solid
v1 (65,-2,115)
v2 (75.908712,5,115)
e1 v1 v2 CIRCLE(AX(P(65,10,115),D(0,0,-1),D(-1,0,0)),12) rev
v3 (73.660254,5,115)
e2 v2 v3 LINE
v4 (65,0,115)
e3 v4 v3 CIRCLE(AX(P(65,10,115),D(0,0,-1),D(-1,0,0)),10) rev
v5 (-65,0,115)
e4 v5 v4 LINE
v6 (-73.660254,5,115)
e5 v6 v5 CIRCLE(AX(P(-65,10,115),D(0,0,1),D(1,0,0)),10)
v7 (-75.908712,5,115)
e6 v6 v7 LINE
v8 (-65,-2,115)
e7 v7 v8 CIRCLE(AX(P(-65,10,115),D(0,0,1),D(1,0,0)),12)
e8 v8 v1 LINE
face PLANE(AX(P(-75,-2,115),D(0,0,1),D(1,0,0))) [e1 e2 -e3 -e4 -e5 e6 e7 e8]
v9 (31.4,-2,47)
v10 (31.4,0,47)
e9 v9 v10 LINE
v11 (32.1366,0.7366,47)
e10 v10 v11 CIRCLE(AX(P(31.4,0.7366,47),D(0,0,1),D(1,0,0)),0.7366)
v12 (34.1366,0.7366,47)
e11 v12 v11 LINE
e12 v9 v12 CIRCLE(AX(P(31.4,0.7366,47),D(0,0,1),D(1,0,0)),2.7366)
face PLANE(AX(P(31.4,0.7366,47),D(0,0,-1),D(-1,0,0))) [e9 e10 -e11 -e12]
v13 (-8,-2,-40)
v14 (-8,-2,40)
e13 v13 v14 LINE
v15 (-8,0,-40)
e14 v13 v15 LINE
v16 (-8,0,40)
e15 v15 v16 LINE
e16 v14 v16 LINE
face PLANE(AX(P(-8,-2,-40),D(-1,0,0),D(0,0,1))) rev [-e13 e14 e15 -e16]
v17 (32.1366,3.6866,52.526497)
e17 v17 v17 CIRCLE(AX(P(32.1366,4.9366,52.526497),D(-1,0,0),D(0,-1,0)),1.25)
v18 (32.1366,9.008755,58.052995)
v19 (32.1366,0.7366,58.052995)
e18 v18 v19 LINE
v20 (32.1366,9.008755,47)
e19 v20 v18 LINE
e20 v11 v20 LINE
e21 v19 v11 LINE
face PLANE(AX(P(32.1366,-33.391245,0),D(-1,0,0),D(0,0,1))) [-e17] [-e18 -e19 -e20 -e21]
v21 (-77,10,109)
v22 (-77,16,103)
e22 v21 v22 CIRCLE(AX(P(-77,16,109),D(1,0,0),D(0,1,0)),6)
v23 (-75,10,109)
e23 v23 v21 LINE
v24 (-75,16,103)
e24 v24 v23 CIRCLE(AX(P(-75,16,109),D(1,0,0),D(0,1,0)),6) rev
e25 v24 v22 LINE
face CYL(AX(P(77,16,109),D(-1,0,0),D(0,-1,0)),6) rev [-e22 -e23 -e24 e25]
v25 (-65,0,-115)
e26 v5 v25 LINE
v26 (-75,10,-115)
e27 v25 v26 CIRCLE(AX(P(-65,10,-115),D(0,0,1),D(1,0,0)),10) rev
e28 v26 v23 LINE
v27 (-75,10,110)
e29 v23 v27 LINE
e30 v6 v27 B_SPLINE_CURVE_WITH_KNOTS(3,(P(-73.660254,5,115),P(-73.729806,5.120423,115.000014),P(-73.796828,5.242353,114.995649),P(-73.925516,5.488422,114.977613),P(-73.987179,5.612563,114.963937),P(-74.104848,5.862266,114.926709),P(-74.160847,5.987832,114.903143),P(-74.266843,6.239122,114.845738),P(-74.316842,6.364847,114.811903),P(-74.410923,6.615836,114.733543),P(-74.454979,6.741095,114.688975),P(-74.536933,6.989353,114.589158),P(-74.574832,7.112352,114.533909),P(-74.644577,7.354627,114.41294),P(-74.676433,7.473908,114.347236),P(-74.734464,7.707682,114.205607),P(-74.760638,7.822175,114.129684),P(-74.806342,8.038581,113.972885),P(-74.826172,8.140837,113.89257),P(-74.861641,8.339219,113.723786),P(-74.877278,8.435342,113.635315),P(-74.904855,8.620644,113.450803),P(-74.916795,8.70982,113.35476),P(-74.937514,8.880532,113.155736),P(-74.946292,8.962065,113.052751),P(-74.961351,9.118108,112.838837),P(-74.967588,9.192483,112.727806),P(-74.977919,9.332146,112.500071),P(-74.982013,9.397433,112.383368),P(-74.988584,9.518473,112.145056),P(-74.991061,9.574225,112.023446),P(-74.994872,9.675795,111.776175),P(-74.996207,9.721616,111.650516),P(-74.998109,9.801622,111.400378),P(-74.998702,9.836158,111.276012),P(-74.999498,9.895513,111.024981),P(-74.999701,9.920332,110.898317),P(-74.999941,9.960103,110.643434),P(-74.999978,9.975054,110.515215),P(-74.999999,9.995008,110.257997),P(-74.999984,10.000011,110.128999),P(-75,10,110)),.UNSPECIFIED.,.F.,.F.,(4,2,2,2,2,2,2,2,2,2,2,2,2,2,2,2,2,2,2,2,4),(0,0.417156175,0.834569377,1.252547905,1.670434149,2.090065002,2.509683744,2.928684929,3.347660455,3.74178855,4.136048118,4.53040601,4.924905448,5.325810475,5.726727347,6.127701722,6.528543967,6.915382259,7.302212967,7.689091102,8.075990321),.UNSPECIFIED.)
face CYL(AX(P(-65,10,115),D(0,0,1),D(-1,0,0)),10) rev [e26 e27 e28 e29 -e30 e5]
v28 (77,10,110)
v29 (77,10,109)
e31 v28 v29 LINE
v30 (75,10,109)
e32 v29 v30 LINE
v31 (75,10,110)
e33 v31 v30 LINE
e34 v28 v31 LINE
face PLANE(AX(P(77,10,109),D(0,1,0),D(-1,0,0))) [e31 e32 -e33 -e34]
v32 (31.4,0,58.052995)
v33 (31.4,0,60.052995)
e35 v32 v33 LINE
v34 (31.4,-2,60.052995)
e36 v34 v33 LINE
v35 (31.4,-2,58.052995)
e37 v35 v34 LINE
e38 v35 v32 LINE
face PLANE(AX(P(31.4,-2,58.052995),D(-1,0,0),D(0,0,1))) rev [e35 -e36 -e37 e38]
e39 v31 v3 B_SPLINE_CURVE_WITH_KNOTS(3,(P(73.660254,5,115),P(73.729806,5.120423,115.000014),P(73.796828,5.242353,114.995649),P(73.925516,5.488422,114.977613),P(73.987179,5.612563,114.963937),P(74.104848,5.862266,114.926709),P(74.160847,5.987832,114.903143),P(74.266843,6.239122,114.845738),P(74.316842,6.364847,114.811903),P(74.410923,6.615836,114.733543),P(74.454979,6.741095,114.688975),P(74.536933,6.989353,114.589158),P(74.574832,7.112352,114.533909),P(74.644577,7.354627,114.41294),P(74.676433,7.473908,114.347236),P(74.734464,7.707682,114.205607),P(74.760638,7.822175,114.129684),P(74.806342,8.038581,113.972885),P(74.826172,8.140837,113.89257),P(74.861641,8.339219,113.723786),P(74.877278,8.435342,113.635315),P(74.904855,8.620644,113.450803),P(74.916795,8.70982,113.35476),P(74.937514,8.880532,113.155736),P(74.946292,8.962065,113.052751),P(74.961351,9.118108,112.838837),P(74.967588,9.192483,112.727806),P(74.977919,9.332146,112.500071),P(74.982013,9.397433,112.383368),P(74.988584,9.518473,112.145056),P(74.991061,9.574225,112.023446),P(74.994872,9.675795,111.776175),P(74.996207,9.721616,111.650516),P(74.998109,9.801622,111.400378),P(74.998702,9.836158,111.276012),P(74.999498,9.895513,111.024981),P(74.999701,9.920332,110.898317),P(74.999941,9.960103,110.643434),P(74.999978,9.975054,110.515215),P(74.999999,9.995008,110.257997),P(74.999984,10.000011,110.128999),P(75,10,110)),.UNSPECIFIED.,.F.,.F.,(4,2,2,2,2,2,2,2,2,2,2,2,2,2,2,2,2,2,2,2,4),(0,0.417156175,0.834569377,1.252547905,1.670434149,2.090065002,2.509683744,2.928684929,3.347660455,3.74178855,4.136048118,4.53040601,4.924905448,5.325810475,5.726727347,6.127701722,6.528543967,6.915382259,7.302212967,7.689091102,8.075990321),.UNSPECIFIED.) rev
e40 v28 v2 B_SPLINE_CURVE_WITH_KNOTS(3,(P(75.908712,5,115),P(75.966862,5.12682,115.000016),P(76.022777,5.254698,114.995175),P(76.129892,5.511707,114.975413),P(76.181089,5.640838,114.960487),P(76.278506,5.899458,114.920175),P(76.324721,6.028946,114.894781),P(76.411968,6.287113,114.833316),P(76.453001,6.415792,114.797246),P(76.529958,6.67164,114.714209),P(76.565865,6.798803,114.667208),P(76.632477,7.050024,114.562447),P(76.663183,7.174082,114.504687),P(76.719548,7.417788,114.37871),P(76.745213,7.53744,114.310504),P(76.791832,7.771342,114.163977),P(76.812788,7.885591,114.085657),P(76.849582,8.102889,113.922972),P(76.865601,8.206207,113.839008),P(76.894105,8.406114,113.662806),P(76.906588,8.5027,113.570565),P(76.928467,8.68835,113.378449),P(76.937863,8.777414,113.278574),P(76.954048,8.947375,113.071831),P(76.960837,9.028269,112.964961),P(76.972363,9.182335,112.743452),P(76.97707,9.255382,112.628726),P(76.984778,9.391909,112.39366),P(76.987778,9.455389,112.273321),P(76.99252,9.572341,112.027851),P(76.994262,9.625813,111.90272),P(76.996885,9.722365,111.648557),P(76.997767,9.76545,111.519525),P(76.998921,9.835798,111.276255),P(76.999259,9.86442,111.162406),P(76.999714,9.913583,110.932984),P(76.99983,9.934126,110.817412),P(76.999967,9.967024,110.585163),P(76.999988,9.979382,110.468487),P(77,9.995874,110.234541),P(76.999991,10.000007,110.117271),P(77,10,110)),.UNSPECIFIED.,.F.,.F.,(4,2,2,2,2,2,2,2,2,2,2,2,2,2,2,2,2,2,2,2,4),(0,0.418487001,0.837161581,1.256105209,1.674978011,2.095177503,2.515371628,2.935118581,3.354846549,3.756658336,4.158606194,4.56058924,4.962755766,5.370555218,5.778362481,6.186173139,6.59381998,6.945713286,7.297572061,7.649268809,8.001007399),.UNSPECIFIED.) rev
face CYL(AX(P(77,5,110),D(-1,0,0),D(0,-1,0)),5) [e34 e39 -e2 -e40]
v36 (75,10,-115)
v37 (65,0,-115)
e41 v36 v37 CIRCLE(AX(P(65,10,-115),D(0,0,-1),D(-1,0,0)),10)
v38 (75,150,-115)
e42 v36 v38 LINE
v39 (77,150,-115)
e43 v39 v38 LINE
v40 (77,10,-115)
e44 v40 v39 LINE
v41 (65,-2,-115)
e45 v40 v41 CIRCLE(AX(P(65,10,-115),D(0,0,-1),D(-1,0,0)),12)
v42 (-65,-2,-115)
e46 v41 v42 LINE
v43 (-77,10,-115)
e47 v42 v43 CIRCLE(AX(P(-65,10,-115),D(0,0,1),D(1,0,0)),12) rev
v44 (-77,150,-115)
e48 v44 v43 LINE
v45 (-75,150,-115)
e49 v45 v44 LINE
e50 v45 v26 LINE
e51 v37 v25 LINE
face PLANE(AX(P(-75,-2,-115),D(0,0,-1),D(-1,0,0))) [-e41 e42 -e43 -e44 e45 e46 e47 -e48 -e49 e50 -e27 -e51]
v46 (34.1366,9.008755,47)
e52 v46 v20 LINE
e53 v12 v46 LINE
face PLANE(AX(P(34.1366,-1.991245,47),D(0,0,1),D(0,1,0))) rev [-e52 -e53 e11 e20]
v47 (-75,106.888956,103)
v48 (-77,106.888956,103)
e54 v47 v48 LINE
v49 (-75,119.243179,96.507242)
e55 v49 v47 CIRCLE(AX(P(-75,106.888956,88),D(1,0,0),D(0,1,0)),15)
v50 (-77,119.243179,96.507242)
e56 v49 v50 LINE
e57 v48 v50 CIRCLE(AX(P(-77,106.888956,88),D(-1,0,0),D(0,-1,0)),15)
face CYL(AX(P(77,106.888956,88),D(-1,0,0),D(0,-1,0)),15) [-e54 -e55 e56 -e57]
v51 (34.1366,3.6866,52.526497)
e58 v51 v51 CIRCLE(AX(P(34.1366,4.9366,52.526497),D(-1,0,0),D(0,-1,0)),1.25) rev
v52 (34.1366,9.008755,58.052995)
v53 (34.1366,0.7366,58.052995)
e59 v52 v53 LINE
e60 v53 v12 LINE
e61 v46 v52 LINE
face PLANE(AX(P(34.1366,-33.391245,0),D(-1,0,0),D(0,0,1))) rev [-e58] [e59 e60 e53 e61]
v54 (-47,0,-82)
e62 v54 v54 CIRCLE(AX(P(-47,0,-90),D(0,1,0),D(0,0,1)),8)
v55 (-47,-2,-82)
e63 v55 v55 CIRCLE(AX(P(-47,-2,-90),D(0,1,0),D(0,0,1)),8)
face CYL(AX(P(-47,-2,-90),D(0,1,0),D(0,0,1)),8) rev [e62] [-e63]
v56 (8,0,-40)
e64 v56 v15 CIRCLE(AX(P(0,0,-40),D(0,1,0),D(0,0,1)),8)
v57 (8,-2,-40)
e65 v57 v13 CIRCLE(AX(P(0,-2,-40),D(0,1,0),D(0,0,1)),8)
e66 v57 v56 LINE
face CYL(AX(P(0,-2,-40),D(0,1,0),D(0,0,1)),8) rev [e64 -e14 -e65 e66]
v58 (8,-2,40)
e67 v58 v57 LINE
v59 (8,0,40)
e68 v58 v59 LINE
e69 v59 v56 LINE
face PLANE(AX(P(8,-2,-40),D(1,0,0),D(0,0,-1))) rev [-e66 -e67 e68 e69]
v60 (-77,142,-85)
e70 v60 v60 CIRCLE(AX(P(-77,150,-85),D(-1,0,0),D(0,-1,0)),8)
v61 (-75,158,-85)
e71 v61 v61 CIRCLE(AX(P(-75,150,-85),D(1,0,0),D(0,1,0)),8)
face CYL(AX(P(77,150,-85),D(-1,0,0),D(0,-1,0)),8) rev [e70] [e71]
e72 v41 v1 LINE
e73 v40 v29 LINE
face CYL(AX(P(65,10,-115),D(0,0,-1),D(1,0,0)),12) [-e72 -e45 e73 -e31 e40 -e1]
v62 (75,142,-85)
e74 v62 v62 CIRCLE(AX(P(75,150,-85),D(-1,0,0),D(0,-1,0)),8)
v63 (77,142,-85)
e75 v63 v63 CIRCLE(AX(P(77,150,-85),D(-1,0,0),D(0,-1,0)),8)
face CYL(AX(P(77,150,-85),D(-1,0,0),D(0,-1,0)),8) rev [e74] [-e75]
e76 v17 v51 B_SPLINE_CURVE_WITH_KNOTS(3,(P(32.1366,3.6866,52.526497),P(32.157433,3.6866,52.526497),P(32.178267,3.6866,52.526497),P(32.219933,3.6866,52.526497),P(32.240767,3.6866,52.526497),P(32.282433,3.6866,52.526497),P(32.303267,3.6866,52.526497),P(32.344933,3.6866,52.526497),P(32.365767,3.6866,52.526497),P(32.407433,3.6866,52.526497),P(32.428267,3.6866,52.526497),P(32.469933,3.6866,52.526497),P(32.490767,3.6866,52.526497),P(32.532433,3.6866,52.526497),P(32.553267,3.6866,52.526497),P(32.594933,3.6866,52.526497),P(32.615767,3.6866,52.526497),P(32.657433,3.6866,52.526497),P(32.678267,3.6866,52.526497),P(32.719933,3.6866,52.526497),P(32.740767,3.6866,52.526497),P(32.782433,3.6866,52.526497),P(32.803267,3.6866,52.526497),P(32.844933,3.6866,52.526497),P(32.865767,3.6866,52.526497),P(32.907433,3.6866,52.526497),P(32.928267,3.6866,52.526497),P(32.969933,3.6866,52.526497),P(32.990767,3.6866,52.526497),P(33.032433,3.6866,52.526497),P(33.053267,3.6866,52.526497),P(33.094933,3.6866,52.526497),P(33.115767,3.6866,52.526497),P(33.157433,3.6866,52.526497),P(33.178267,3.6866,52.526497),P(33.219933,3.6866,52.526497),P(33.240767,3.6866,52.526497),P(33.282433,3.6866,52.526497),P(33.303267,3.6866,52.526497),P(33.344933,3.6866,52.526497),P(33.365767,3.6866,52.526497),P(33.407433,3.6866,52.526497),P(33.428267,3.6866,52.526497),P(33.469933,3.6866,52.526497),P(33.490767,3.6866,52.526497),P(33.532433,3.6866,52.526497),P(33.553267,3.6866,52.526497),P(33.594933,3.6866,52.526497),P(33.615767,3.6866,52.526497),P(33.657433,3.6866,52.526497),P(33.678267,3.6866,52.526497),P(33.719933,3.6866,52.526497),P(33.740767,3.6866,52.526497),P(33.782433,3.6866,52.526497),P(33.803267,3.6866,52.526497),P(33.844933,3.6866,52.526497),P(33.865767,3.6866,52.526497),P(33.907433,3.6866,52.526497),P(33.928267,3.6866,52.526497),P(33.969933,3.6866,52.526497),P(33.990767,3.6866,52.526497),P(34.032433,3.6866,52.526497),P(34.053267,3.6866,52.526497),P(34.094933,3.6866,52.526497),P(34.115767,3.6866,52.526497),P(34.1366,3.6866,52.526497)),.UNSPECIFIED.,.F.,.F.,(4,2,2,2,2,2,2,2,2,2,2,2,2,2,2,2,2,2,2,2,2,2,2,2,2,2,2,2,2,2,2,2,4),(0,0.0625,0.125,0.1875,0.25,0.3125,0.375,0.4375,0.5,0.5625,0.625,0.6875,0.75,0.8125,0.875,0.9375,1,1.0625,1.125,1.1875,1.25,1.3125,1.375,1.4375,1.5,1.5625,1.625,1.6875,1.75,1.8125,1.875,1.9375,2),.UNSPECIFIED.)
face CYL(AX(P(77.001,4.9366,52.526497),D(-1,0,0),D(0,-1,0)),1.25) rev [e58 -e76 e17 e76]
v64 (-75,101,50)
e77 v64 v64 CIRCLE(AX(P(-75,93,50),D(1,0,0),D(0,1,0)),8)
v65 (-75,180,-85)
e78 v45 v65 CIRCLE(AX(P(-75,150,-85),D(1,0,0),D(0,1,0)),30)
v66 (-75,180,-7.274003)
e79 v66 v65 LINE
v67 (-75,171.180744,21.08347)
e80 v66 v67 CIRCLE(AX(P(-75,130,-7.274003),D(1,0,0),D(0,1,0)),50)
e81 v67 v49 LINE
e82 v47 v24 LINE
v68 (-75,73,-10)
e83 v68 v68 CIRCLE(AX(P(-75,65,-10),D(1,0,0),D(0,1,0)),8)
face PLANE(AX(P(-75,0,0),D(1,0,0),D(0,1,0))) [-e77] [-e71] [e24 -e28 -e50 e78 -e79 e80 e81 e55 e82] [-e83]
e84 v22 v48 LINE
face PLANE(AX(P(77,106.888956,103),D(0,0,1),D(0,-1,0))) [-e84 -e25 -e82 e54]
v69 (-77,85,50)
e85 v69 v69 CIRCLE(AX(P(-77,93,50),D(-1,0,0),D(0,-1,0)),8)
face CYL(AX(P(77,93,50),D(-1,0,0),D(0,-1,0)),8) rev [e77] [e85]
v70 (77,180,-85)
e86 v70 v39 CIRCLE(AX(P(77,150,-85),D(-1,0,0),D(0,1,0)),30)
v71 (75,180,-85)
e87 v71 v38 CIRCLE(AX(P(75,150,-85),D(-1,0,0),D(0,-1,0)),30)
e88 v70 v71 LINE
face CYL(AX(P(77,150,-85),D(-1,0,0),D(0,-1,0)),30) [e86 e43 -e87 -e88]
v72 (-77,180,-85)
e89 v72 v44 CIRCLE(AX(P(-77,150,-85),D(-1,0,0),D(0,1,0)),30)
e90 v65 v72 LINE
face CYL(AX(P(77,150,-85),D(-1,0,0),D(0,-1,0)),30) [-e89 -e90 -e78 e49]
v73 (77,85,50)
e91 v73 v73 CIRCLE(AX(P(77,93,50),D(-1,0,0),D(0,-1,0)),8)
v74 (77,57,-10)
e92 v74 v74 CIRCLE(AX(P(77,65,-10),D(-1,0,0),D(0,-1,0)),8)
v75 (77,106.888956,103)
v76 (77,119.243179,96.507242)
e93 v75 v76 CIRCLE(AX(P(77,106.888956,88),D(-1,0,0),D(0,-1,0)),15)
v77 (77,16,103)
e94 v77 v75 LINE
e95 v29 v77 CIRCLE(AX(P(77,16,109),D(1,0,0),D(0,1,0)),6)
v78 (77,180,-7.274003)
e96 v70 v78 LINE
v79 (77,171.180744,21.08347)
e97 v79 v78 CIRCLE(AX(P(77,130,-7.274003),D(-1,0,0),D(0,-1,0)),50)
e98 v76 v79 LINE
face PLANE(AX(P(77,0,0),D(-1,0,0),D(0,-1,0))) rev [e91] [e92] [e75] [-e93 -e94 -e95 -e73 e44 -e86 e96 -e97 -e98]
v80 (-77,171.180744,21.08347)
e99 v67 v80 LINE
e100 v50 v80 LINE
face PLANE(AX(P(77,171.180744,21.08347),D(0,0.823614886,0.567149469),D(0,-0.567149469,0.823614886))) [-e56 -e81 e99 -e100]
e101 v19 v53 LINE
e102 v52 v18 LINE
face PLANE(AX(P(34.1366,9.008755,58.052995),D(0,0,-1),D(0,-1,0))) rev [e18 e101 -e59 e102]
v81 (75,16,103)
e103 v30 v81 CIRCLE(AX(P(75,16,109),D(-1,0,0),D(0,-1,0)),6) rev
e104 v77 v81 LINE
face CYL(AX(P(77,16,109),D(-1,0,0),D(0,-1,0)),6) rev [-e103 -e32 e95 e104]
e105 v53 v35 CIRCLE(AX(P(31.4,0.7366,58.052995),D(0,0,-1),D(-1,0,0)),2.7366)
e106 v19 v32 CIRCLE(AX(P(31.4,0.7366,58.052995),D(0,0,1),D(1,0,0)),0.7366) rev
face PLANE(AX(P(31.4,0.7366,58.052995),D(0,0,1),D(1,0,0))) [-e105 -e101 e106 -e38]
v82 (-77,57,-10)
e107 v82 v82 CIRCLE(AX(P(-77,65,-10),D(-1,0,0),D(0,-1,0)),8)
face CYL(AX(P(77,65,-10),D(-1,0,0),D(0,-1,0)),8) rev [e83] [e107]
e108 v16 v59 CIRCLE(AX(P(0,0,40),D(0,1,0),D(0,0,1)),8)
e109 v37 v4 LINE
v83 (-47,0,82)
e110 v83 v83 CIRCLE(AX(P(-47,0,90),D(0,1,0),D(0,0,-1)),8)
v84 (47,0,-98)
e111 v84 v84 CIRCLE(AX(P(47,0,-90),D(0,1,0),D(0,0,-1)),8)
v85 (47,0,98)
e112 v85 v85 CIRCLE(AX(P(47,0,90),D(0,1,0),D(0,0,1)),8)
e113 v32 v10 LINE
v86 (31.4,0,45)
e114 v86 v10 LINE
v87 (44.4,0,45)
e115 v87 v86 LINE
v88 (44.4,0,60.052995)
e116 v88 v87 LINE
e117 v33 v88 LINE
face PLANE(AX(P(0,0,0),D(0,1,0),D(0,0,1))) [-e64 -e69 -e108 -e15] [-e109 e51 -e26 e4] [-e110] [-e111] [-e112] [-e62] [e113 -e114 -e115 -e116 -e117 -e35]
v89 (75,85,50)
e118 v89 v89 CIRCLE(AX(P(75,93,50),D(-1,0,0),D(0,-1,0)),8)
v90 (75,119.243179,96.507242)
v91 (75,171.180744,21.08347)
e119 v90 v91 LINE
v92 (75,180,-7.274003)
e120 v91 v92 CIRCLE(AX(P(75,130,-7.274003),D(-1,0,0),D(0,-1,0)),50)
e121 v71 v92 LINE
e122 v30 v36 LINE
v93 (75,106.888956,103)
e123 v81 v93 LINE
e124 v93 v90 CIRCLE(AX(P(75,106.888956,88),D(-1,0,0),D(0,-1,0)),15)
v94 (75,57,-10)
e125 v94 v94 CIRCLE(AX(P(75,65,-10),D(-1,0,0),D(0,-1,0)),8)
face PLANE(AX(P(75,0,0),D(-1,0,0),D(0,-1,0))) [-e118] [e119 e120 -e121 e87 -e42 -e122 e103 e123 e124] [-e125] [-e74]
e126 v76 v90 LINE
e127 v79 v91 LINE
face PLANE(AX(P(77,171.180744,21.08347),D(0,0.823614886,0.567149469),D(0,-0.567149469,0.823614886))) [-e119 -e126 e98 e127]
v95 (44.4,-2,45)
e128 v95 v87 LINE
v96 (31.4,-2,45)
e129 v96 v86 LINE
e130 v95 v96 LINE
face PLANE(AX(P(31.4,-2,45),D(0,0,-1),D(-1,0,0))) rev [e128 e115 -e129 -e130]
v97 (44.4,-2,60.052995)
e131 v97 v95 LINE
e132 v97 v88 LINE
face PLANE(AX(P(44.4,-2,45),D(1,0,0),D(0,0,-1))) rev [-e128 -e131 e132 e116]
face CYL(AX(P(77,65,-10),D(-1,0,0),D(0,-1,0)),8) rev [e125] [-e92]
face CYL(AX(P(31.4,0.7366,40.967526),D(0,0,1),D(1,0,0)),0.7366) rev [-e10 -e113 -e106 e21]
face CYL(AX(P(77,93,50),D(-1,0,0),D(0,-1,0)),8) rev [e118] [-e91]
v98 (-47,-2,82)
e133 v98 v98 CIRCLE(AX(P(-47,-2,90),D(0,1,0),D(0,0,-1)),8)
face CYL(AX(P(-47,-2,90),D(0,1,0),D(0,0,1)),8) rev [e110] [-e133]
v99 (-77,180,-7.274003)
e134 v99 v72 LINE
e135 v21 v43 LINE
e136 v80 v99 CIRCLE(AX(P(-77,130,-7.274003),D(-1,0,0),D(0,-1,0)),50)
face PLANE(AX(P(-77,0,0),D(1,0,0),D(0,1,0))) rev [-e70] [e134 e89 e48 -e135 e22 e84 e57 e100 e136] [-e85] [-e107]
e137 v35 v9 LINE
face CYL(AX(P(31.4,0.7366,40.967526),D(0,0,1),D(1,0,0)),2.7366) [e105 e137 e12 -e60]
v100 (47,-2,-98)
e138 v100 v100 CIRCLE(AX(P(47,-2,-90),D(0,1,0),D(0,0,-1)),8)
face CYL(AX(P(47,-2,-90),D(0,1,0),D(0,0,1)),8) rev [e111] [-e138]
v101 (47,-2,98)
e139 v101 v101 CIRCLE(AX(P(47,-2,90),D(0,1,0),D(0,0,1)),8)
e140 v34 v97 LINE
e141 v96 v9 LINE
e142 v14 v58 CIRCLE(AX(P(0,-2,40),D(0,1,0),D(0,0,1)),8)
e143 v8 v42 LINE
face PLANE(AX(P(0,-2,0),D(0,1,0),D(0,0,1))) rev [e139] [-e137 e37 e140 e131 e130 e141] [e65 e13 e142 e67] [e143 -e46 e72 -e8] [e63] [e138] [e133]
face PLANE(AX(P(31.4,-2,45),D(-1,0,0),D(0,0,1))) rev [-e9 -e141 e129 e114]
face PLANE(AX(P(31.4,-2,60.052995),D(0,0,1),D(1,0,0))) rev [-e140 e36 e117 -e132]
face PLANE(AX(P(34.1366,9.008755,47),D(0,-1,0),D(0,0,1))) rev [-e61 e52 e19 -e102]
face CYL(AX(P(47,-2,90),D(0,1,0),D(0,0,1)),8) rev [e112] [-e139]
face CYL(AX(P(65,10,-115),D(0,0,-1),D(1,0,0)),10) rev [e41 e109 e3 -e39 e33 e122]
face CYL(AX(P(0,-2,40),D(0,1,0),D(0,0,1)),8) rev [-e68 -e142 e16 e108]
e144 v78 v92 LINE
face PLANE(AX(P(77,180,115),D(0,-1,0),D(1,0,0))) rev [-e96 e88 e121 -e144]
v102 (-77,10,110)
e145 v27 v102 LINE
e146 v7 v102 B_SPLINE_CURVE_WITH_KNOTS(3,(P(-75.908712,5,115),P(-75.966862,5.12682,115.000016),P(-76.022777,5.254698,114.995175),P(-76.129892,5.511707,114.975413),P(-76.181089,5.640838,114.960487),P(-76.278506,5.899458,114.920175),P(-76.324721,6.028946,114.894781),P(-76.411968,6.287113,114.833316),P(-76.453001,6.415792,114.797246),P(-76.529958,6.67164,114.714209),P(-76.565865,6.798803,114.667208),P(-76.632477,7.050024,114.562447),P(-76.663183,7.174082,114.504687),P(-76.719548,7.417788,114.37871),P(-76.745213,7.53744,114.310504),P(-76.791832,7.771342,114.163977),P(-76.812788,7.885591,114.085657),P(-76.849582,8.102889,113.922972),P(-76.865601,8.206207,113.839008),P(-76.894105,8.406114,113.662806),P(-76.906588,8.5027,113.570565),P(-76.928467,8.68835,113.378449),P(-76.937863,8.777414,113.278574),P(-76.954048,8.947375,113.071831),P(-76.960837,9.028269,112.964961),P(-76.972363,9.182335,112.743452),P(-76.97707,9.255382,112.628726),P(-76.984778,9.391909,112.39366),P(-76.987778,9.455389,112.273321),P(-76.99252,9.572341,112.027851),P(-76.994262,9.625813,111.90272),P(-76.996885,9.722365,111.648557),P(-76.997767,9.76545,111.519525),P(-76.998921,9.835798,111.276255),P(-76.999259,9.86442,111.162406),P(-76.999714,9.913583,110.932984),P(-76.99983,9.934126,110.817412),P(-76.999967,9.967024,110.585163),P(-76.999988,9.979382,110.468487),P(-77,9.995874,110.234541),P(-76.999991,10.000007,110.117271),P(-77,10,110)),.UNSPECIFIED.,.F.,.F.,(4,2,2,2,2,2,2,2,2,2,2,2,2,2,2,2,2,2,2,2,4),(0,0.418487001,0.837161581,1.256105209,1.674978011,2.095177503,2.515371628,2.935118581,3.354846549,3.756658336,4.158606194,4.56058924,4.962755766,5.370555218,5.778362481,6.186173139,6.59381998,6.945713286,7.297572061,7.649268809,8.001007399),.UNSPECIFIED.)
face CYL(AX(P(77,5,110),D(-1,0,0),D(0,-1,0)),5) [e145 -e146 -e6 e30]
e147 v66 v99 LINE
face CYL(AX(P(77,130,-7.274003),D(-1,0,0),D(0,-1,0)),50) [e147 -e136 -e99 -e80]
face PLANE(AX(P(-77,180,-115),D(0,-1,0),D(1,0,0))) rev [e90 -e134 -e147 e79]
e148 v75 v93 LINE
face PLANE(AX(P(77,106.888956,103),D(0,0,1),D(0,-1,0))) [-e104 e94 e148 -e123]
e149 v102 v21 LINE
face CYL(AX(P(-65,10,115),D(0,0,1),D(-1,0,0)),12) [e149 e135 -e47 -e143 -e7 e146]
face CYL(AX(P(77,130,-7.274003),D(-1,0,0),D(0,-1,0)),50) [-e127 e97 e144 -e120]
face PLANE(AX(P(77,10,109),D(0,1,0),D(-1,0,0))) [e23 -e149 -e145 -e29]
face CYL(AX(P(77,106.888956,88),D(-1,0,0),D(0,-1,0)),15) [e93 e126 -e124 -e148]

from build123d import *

# Parameters (mm, degrees)
SKETCH1_W                      = 150
SKETCH1_H                      = 230
BASE_FLANGE1_DEPTH             = 2
EDGE_FLANGE1_STRIP_W           = 28
EDGE_FLANGE1_STRIP_H           = 2
EDGE_FLANGE1_STRIP_CUT_DEPTH   = 230
EDGE_FLANGE1_STRIP_2_W         = 28
EDGE_FLANGE1_STRIP_2_H         = 2
EDGE_FLANGE1_STRIP_CUT_2_DEPTH = 230
EDGE_FLANGE1_DEPTH             = 230
EDGE_FLANGE1_BEND_DEPTH        = 230
SKETCH15_OUTSIDE_W             = 298.254
SKETCH15_OUTSIDE_H             = 250.254
SKETCH15_OUTSIDE_R             = 8
CUT_EXTRUDE1_DEPTH             = 264.326793168
SKETCH16_R                     = 8
CUT_EXTRUDE2_DEPTH             = 228.055059487
CUT_EXTRUDE3_DEPTH             = 228.055059487
SKETCHED_START                 = 47
SKETCHED_BEND1_DEPTH           = 11.052994728
SKETCHED_BEND1_2_DEPTH         = 11.052994728
CUT_EXTRUDE4_REACH             = 241.866
SKETCH20_R                     = 1.25


# Read off the part's stored shape, not the designer's step: Sketched Bend1
# Sheet-metal steps are written as plain solids
with BuildPart() as part:
    # Sketch1 → Base-Flange1 (new body)
    with BuildSketch(Plane(origin=(0, 0, 0), x_dir=(1, 0, 0), z_dir=(0, 1, 0))):
        Rectangle(SKETCH1_W, SKETCH1_H)
    extrude(amount=-BASE_FLANGE1_DEPTH)

    # Edge-Flange1 strip (across the edge) → Edge-Flange1 strip cut (cut)
    with BuildSketch(Plane(origin=(75, 0, 115), x_dir=(-1, 0, 0), z_dir=(0, 0, -1))):
        with Locations((-4, -1)):
            Rectangle(EDGE_FLANGE1_STRIP_W, EDGE_FLANGE1_STRIP_H)
    extrude(amount=EDGE_FLANGE1_STRIP_CUT_DEPTH, mode=Mode.SUBTRACT)

    # Edge-Flange1 strip 2 (across the edge) → Edge-Flange1 strip cut 2 (cut)
    with BuildSketch(Plane(origin=(-75, 0, -115), x_dir=(1, 0, 0), z_dir=(0, 0, 1))):
        with Locations((-4, -1)):
            Rectangle(EDGE_FLANGE1_STRIP_2_W, EDGE_FLANGE1_STRIP_2_H)
    extrude(amount=EDGE_FLANGE1_STRIP_CUT_2_DEPTH, mode=Mode.SUBTRACT)

    # Edge-Flange1 section (across the edge) → Edge-Flange1 (add)
    with BuildSketch(Plane(origin=(75, 0, 115), x_dir=(-1, 0, 0), z_dir=(0, 0, -1))):
        with BuildLine():
            Line((-2, 10), (-2, 180))
            Line((-2, 180), (0, 180))
            Line((0, 180), (0, 10))
            ThreePointArc((0, 10), (2.928932188, 2.928932188), (10, 0))
            Line((10, 0), (10, -2))
            ThreePointArc((10, -2), (1.514718626, 1.514718626), (-2, 10))
        make_face()
    extrude(amount=EDGE_FLANGE1_DEPTH)

    # Edge-Flange1 section 2 (across the edge) → Edge-Flange1 bend (add)
    with BuildSketch(Plane(origin=(-75, 0, -115), x_dir=(1, 0, 0), z_dir=(0, 0, 1))):
        with BuildLine():
            Line((-2, 10), (-2, 180))
            Line((-2, 180), (0, 180))
            Line((0, 180), (0, 10))
            ThreePointArc((0, 10), (2.928932188, 2.928932188), (10, 0))
            Line((10, 0), (10, -2))
            ThreePointArc((10, -2), (1.514718626, 1.514718626), (-2, 10))
        make_face()
    extrude(amount=EDGE_FLANGE1_BEND_DEPTH)

    # Sketch15 outside → Cut-Extrude1 (cut, through all)
    # profile 1 of 4: a face of its own
    with BuildSketch(Plane.ZY.offset(77)):
        with Locations((0, 89)):
            Rectangle(SKETCH15_OUTSIDE_W, SKETCH15_OUTSIDE_H)
        with BuildLine():
            Line((21.083470393, 171.180744276), (96.507242037, 119.243178795))
            ThreePointArc((96.507242037, 119.243178795), (101.277963521, 113.867184852), (103, 106.888955512))
            Line((103, 106.888955512), (103, 16))
            ThreePointArc((103, 16), (104.757359313, 11.757359313), (109, 10))
            Line((109, 10), (110, 10))
            ThreePointArc((110, 10), (113.535533906, 8.535533906), (115, 5))
            Line((115, 5), (115, -2))
            Line((115, -2), (-115, -2))
            Line((-115, -2), (-115, 99))
            Line((-115, 99), (-115, 150))
            ThreePointArc((-115, 150), (-106.213203436, 171.213203436), (-85, 180))
            Line((-85, 180), (-49, 180))
            Line((-49, 180), (-7.274003064, 180))
            ThreePointArc((-7.274003064, 180), (7.574612801, 177.744304445), (21.083470393, 171.180744276))
        make_face(mode=Mode.SUBTRACT)
    # profile 2 of 4: a face of its own
    with BuildSketch(Plane.ZY.offset(77)):
        with Locations(Location((50, 93, 0), (0, 0, 270))):
            Circle(SKETCH15_OUTSIDE_R)
    # profile 3 of 4: a face of its own
    with BuildSketch(Plane.ZY.offset(77)):
        with Locations(Location((-85, 150, 0), (0, 0, 270))):
            Circle(SKETCH15_OUTSIDE_R)
    # profile 4 of 4: a face of its own
    with BuildSketch(Plane.ZY.offset(77)):
        with Locations(Location((-10, 65, 0), (0, 0, 270))):
            Circle(SKETCH15_OUTSIDE_R)
    extrude(amount=-CUT_EXTRUDE1_DEPTH, mode=Mode.SUBTRACT)

    # Sketch16 → Cut-Extrude2 (cut, through all)
    with BuildSketch(Plane(origin=(0, 0, 0), x_dir=(1, 0, 0), z_dir=(0, 1, 0))):
        with Locations(Location((-47, 90, 0), (0, 0, 270))):
            Circle(SKETCH16_R)
        with Locations(Location((47, 90, 0), (0, 0, 90))):
            Circle(SKETCH16_R)
        with Locations(Location((47, -90, 0), (0, 0, 270))):
            Circle(SKETCH16_R)
        with Locations(Location((-47, -90, 0), (0, 0, 90))):
            Circle(SKETCH16_R)
        with BuildLine():
            Line((8, 40), (8, -40))
            ThreePointArc((8, -40), (0, -48), (-8, -40))
            Line((-8, -40), (-8, 40))
            ThreePointArc((-8, 40), (0, 48), (8, 40))
        make_face()
    extrude(amount=-CUT_EXTRUDE2_DEPTH, mode=Mode.SUBTRACT)

    # Sketch18 → Cut-Extrude3 (cut, through all)
    with BuildSketch(Plane(origin=(0, 0, 0), x_dir=(1, 0, 0), z_dir=(0, 1, 0))):
        Polygon((31.4, -45), (44.4, -45), (44.4, -60.052994728), (31.4, -60.052994728), (31.4, -58.052994728), (42.4, -58.052994728), (42.4, -47), (31.4, -47), align=None)
    extrude(amount=-CUT_EXTRUDE3_DEPTH, mode=Mode.SUBTRACT)

    # Sketched Bend1 outline → Sketched Bend1 (cut)
    with BuildSketch(Plane.XY.offset(SKETCHED_START)):
        with BuildLine():
            ThreePointArc((34.035602398, 0), (33.054267209, -1.443395312), (31.4, -2))
            Line((31.4, -2), (42.4, -2))
            Line((42.4, -2), (42.4, 0))
            Line((42.4, 0), (34.035602398, 0))
        make_face()
    extrude(amount=SKETCHED_BEND1_DEPTH, mode=Mode.SUBTRACT)

    # Sketched Bend1 2 outline → Sketched Bend1 2 (add)
    with BuildSketch(Plane.XY.offset(SKETCHED_START)):
        with BuildLine():
            Line((31.4, 0), (34.035602398, 0))
            ThreePointArc((34.035602398, 0), (34.111233029, 0.364854094), (34.1366, 0.7366))
            Line((34.1366, 0.7366), (34.1366, 9.008755099))
            Line((34.1366, 9.008755099), (32.1366, 9.008755099))
            Line((32.1366, 9.008755099), (32.1366, 0.7366))
            ThreePointArc((32.1366, 0.7366), (31.920854855, 0.215745145), (31.4, 0))
        make_face()
    extrude(amount=SKETCHED_BEND1_2_DEPTH)

    # Sketch20 → Cut-Extrude4 (cut, up to next)
    with BuildSketch(Plane.ZY.offset(-32.1366), mode=Mode.PRIVATE) as cut_extrude4_sk1:
        with Locations(Location((52.526497364, 4.9366, 0), (0, 0, 270))):
            Circle(SKETCH20_R)
    cut_extrude4_tool1 = extrude(cut_extrude4_sk1.sketch, amount=-CUT_EXTRUDE4_REACH, mode=Mode.PRIVATE) & part.part
    add(cut_extrude4_tool1.solids().sort_by_distance((32.1366, 4.9366, 52.526497))[0], mode=Mode.SUBTRACT)


solid = part.part
